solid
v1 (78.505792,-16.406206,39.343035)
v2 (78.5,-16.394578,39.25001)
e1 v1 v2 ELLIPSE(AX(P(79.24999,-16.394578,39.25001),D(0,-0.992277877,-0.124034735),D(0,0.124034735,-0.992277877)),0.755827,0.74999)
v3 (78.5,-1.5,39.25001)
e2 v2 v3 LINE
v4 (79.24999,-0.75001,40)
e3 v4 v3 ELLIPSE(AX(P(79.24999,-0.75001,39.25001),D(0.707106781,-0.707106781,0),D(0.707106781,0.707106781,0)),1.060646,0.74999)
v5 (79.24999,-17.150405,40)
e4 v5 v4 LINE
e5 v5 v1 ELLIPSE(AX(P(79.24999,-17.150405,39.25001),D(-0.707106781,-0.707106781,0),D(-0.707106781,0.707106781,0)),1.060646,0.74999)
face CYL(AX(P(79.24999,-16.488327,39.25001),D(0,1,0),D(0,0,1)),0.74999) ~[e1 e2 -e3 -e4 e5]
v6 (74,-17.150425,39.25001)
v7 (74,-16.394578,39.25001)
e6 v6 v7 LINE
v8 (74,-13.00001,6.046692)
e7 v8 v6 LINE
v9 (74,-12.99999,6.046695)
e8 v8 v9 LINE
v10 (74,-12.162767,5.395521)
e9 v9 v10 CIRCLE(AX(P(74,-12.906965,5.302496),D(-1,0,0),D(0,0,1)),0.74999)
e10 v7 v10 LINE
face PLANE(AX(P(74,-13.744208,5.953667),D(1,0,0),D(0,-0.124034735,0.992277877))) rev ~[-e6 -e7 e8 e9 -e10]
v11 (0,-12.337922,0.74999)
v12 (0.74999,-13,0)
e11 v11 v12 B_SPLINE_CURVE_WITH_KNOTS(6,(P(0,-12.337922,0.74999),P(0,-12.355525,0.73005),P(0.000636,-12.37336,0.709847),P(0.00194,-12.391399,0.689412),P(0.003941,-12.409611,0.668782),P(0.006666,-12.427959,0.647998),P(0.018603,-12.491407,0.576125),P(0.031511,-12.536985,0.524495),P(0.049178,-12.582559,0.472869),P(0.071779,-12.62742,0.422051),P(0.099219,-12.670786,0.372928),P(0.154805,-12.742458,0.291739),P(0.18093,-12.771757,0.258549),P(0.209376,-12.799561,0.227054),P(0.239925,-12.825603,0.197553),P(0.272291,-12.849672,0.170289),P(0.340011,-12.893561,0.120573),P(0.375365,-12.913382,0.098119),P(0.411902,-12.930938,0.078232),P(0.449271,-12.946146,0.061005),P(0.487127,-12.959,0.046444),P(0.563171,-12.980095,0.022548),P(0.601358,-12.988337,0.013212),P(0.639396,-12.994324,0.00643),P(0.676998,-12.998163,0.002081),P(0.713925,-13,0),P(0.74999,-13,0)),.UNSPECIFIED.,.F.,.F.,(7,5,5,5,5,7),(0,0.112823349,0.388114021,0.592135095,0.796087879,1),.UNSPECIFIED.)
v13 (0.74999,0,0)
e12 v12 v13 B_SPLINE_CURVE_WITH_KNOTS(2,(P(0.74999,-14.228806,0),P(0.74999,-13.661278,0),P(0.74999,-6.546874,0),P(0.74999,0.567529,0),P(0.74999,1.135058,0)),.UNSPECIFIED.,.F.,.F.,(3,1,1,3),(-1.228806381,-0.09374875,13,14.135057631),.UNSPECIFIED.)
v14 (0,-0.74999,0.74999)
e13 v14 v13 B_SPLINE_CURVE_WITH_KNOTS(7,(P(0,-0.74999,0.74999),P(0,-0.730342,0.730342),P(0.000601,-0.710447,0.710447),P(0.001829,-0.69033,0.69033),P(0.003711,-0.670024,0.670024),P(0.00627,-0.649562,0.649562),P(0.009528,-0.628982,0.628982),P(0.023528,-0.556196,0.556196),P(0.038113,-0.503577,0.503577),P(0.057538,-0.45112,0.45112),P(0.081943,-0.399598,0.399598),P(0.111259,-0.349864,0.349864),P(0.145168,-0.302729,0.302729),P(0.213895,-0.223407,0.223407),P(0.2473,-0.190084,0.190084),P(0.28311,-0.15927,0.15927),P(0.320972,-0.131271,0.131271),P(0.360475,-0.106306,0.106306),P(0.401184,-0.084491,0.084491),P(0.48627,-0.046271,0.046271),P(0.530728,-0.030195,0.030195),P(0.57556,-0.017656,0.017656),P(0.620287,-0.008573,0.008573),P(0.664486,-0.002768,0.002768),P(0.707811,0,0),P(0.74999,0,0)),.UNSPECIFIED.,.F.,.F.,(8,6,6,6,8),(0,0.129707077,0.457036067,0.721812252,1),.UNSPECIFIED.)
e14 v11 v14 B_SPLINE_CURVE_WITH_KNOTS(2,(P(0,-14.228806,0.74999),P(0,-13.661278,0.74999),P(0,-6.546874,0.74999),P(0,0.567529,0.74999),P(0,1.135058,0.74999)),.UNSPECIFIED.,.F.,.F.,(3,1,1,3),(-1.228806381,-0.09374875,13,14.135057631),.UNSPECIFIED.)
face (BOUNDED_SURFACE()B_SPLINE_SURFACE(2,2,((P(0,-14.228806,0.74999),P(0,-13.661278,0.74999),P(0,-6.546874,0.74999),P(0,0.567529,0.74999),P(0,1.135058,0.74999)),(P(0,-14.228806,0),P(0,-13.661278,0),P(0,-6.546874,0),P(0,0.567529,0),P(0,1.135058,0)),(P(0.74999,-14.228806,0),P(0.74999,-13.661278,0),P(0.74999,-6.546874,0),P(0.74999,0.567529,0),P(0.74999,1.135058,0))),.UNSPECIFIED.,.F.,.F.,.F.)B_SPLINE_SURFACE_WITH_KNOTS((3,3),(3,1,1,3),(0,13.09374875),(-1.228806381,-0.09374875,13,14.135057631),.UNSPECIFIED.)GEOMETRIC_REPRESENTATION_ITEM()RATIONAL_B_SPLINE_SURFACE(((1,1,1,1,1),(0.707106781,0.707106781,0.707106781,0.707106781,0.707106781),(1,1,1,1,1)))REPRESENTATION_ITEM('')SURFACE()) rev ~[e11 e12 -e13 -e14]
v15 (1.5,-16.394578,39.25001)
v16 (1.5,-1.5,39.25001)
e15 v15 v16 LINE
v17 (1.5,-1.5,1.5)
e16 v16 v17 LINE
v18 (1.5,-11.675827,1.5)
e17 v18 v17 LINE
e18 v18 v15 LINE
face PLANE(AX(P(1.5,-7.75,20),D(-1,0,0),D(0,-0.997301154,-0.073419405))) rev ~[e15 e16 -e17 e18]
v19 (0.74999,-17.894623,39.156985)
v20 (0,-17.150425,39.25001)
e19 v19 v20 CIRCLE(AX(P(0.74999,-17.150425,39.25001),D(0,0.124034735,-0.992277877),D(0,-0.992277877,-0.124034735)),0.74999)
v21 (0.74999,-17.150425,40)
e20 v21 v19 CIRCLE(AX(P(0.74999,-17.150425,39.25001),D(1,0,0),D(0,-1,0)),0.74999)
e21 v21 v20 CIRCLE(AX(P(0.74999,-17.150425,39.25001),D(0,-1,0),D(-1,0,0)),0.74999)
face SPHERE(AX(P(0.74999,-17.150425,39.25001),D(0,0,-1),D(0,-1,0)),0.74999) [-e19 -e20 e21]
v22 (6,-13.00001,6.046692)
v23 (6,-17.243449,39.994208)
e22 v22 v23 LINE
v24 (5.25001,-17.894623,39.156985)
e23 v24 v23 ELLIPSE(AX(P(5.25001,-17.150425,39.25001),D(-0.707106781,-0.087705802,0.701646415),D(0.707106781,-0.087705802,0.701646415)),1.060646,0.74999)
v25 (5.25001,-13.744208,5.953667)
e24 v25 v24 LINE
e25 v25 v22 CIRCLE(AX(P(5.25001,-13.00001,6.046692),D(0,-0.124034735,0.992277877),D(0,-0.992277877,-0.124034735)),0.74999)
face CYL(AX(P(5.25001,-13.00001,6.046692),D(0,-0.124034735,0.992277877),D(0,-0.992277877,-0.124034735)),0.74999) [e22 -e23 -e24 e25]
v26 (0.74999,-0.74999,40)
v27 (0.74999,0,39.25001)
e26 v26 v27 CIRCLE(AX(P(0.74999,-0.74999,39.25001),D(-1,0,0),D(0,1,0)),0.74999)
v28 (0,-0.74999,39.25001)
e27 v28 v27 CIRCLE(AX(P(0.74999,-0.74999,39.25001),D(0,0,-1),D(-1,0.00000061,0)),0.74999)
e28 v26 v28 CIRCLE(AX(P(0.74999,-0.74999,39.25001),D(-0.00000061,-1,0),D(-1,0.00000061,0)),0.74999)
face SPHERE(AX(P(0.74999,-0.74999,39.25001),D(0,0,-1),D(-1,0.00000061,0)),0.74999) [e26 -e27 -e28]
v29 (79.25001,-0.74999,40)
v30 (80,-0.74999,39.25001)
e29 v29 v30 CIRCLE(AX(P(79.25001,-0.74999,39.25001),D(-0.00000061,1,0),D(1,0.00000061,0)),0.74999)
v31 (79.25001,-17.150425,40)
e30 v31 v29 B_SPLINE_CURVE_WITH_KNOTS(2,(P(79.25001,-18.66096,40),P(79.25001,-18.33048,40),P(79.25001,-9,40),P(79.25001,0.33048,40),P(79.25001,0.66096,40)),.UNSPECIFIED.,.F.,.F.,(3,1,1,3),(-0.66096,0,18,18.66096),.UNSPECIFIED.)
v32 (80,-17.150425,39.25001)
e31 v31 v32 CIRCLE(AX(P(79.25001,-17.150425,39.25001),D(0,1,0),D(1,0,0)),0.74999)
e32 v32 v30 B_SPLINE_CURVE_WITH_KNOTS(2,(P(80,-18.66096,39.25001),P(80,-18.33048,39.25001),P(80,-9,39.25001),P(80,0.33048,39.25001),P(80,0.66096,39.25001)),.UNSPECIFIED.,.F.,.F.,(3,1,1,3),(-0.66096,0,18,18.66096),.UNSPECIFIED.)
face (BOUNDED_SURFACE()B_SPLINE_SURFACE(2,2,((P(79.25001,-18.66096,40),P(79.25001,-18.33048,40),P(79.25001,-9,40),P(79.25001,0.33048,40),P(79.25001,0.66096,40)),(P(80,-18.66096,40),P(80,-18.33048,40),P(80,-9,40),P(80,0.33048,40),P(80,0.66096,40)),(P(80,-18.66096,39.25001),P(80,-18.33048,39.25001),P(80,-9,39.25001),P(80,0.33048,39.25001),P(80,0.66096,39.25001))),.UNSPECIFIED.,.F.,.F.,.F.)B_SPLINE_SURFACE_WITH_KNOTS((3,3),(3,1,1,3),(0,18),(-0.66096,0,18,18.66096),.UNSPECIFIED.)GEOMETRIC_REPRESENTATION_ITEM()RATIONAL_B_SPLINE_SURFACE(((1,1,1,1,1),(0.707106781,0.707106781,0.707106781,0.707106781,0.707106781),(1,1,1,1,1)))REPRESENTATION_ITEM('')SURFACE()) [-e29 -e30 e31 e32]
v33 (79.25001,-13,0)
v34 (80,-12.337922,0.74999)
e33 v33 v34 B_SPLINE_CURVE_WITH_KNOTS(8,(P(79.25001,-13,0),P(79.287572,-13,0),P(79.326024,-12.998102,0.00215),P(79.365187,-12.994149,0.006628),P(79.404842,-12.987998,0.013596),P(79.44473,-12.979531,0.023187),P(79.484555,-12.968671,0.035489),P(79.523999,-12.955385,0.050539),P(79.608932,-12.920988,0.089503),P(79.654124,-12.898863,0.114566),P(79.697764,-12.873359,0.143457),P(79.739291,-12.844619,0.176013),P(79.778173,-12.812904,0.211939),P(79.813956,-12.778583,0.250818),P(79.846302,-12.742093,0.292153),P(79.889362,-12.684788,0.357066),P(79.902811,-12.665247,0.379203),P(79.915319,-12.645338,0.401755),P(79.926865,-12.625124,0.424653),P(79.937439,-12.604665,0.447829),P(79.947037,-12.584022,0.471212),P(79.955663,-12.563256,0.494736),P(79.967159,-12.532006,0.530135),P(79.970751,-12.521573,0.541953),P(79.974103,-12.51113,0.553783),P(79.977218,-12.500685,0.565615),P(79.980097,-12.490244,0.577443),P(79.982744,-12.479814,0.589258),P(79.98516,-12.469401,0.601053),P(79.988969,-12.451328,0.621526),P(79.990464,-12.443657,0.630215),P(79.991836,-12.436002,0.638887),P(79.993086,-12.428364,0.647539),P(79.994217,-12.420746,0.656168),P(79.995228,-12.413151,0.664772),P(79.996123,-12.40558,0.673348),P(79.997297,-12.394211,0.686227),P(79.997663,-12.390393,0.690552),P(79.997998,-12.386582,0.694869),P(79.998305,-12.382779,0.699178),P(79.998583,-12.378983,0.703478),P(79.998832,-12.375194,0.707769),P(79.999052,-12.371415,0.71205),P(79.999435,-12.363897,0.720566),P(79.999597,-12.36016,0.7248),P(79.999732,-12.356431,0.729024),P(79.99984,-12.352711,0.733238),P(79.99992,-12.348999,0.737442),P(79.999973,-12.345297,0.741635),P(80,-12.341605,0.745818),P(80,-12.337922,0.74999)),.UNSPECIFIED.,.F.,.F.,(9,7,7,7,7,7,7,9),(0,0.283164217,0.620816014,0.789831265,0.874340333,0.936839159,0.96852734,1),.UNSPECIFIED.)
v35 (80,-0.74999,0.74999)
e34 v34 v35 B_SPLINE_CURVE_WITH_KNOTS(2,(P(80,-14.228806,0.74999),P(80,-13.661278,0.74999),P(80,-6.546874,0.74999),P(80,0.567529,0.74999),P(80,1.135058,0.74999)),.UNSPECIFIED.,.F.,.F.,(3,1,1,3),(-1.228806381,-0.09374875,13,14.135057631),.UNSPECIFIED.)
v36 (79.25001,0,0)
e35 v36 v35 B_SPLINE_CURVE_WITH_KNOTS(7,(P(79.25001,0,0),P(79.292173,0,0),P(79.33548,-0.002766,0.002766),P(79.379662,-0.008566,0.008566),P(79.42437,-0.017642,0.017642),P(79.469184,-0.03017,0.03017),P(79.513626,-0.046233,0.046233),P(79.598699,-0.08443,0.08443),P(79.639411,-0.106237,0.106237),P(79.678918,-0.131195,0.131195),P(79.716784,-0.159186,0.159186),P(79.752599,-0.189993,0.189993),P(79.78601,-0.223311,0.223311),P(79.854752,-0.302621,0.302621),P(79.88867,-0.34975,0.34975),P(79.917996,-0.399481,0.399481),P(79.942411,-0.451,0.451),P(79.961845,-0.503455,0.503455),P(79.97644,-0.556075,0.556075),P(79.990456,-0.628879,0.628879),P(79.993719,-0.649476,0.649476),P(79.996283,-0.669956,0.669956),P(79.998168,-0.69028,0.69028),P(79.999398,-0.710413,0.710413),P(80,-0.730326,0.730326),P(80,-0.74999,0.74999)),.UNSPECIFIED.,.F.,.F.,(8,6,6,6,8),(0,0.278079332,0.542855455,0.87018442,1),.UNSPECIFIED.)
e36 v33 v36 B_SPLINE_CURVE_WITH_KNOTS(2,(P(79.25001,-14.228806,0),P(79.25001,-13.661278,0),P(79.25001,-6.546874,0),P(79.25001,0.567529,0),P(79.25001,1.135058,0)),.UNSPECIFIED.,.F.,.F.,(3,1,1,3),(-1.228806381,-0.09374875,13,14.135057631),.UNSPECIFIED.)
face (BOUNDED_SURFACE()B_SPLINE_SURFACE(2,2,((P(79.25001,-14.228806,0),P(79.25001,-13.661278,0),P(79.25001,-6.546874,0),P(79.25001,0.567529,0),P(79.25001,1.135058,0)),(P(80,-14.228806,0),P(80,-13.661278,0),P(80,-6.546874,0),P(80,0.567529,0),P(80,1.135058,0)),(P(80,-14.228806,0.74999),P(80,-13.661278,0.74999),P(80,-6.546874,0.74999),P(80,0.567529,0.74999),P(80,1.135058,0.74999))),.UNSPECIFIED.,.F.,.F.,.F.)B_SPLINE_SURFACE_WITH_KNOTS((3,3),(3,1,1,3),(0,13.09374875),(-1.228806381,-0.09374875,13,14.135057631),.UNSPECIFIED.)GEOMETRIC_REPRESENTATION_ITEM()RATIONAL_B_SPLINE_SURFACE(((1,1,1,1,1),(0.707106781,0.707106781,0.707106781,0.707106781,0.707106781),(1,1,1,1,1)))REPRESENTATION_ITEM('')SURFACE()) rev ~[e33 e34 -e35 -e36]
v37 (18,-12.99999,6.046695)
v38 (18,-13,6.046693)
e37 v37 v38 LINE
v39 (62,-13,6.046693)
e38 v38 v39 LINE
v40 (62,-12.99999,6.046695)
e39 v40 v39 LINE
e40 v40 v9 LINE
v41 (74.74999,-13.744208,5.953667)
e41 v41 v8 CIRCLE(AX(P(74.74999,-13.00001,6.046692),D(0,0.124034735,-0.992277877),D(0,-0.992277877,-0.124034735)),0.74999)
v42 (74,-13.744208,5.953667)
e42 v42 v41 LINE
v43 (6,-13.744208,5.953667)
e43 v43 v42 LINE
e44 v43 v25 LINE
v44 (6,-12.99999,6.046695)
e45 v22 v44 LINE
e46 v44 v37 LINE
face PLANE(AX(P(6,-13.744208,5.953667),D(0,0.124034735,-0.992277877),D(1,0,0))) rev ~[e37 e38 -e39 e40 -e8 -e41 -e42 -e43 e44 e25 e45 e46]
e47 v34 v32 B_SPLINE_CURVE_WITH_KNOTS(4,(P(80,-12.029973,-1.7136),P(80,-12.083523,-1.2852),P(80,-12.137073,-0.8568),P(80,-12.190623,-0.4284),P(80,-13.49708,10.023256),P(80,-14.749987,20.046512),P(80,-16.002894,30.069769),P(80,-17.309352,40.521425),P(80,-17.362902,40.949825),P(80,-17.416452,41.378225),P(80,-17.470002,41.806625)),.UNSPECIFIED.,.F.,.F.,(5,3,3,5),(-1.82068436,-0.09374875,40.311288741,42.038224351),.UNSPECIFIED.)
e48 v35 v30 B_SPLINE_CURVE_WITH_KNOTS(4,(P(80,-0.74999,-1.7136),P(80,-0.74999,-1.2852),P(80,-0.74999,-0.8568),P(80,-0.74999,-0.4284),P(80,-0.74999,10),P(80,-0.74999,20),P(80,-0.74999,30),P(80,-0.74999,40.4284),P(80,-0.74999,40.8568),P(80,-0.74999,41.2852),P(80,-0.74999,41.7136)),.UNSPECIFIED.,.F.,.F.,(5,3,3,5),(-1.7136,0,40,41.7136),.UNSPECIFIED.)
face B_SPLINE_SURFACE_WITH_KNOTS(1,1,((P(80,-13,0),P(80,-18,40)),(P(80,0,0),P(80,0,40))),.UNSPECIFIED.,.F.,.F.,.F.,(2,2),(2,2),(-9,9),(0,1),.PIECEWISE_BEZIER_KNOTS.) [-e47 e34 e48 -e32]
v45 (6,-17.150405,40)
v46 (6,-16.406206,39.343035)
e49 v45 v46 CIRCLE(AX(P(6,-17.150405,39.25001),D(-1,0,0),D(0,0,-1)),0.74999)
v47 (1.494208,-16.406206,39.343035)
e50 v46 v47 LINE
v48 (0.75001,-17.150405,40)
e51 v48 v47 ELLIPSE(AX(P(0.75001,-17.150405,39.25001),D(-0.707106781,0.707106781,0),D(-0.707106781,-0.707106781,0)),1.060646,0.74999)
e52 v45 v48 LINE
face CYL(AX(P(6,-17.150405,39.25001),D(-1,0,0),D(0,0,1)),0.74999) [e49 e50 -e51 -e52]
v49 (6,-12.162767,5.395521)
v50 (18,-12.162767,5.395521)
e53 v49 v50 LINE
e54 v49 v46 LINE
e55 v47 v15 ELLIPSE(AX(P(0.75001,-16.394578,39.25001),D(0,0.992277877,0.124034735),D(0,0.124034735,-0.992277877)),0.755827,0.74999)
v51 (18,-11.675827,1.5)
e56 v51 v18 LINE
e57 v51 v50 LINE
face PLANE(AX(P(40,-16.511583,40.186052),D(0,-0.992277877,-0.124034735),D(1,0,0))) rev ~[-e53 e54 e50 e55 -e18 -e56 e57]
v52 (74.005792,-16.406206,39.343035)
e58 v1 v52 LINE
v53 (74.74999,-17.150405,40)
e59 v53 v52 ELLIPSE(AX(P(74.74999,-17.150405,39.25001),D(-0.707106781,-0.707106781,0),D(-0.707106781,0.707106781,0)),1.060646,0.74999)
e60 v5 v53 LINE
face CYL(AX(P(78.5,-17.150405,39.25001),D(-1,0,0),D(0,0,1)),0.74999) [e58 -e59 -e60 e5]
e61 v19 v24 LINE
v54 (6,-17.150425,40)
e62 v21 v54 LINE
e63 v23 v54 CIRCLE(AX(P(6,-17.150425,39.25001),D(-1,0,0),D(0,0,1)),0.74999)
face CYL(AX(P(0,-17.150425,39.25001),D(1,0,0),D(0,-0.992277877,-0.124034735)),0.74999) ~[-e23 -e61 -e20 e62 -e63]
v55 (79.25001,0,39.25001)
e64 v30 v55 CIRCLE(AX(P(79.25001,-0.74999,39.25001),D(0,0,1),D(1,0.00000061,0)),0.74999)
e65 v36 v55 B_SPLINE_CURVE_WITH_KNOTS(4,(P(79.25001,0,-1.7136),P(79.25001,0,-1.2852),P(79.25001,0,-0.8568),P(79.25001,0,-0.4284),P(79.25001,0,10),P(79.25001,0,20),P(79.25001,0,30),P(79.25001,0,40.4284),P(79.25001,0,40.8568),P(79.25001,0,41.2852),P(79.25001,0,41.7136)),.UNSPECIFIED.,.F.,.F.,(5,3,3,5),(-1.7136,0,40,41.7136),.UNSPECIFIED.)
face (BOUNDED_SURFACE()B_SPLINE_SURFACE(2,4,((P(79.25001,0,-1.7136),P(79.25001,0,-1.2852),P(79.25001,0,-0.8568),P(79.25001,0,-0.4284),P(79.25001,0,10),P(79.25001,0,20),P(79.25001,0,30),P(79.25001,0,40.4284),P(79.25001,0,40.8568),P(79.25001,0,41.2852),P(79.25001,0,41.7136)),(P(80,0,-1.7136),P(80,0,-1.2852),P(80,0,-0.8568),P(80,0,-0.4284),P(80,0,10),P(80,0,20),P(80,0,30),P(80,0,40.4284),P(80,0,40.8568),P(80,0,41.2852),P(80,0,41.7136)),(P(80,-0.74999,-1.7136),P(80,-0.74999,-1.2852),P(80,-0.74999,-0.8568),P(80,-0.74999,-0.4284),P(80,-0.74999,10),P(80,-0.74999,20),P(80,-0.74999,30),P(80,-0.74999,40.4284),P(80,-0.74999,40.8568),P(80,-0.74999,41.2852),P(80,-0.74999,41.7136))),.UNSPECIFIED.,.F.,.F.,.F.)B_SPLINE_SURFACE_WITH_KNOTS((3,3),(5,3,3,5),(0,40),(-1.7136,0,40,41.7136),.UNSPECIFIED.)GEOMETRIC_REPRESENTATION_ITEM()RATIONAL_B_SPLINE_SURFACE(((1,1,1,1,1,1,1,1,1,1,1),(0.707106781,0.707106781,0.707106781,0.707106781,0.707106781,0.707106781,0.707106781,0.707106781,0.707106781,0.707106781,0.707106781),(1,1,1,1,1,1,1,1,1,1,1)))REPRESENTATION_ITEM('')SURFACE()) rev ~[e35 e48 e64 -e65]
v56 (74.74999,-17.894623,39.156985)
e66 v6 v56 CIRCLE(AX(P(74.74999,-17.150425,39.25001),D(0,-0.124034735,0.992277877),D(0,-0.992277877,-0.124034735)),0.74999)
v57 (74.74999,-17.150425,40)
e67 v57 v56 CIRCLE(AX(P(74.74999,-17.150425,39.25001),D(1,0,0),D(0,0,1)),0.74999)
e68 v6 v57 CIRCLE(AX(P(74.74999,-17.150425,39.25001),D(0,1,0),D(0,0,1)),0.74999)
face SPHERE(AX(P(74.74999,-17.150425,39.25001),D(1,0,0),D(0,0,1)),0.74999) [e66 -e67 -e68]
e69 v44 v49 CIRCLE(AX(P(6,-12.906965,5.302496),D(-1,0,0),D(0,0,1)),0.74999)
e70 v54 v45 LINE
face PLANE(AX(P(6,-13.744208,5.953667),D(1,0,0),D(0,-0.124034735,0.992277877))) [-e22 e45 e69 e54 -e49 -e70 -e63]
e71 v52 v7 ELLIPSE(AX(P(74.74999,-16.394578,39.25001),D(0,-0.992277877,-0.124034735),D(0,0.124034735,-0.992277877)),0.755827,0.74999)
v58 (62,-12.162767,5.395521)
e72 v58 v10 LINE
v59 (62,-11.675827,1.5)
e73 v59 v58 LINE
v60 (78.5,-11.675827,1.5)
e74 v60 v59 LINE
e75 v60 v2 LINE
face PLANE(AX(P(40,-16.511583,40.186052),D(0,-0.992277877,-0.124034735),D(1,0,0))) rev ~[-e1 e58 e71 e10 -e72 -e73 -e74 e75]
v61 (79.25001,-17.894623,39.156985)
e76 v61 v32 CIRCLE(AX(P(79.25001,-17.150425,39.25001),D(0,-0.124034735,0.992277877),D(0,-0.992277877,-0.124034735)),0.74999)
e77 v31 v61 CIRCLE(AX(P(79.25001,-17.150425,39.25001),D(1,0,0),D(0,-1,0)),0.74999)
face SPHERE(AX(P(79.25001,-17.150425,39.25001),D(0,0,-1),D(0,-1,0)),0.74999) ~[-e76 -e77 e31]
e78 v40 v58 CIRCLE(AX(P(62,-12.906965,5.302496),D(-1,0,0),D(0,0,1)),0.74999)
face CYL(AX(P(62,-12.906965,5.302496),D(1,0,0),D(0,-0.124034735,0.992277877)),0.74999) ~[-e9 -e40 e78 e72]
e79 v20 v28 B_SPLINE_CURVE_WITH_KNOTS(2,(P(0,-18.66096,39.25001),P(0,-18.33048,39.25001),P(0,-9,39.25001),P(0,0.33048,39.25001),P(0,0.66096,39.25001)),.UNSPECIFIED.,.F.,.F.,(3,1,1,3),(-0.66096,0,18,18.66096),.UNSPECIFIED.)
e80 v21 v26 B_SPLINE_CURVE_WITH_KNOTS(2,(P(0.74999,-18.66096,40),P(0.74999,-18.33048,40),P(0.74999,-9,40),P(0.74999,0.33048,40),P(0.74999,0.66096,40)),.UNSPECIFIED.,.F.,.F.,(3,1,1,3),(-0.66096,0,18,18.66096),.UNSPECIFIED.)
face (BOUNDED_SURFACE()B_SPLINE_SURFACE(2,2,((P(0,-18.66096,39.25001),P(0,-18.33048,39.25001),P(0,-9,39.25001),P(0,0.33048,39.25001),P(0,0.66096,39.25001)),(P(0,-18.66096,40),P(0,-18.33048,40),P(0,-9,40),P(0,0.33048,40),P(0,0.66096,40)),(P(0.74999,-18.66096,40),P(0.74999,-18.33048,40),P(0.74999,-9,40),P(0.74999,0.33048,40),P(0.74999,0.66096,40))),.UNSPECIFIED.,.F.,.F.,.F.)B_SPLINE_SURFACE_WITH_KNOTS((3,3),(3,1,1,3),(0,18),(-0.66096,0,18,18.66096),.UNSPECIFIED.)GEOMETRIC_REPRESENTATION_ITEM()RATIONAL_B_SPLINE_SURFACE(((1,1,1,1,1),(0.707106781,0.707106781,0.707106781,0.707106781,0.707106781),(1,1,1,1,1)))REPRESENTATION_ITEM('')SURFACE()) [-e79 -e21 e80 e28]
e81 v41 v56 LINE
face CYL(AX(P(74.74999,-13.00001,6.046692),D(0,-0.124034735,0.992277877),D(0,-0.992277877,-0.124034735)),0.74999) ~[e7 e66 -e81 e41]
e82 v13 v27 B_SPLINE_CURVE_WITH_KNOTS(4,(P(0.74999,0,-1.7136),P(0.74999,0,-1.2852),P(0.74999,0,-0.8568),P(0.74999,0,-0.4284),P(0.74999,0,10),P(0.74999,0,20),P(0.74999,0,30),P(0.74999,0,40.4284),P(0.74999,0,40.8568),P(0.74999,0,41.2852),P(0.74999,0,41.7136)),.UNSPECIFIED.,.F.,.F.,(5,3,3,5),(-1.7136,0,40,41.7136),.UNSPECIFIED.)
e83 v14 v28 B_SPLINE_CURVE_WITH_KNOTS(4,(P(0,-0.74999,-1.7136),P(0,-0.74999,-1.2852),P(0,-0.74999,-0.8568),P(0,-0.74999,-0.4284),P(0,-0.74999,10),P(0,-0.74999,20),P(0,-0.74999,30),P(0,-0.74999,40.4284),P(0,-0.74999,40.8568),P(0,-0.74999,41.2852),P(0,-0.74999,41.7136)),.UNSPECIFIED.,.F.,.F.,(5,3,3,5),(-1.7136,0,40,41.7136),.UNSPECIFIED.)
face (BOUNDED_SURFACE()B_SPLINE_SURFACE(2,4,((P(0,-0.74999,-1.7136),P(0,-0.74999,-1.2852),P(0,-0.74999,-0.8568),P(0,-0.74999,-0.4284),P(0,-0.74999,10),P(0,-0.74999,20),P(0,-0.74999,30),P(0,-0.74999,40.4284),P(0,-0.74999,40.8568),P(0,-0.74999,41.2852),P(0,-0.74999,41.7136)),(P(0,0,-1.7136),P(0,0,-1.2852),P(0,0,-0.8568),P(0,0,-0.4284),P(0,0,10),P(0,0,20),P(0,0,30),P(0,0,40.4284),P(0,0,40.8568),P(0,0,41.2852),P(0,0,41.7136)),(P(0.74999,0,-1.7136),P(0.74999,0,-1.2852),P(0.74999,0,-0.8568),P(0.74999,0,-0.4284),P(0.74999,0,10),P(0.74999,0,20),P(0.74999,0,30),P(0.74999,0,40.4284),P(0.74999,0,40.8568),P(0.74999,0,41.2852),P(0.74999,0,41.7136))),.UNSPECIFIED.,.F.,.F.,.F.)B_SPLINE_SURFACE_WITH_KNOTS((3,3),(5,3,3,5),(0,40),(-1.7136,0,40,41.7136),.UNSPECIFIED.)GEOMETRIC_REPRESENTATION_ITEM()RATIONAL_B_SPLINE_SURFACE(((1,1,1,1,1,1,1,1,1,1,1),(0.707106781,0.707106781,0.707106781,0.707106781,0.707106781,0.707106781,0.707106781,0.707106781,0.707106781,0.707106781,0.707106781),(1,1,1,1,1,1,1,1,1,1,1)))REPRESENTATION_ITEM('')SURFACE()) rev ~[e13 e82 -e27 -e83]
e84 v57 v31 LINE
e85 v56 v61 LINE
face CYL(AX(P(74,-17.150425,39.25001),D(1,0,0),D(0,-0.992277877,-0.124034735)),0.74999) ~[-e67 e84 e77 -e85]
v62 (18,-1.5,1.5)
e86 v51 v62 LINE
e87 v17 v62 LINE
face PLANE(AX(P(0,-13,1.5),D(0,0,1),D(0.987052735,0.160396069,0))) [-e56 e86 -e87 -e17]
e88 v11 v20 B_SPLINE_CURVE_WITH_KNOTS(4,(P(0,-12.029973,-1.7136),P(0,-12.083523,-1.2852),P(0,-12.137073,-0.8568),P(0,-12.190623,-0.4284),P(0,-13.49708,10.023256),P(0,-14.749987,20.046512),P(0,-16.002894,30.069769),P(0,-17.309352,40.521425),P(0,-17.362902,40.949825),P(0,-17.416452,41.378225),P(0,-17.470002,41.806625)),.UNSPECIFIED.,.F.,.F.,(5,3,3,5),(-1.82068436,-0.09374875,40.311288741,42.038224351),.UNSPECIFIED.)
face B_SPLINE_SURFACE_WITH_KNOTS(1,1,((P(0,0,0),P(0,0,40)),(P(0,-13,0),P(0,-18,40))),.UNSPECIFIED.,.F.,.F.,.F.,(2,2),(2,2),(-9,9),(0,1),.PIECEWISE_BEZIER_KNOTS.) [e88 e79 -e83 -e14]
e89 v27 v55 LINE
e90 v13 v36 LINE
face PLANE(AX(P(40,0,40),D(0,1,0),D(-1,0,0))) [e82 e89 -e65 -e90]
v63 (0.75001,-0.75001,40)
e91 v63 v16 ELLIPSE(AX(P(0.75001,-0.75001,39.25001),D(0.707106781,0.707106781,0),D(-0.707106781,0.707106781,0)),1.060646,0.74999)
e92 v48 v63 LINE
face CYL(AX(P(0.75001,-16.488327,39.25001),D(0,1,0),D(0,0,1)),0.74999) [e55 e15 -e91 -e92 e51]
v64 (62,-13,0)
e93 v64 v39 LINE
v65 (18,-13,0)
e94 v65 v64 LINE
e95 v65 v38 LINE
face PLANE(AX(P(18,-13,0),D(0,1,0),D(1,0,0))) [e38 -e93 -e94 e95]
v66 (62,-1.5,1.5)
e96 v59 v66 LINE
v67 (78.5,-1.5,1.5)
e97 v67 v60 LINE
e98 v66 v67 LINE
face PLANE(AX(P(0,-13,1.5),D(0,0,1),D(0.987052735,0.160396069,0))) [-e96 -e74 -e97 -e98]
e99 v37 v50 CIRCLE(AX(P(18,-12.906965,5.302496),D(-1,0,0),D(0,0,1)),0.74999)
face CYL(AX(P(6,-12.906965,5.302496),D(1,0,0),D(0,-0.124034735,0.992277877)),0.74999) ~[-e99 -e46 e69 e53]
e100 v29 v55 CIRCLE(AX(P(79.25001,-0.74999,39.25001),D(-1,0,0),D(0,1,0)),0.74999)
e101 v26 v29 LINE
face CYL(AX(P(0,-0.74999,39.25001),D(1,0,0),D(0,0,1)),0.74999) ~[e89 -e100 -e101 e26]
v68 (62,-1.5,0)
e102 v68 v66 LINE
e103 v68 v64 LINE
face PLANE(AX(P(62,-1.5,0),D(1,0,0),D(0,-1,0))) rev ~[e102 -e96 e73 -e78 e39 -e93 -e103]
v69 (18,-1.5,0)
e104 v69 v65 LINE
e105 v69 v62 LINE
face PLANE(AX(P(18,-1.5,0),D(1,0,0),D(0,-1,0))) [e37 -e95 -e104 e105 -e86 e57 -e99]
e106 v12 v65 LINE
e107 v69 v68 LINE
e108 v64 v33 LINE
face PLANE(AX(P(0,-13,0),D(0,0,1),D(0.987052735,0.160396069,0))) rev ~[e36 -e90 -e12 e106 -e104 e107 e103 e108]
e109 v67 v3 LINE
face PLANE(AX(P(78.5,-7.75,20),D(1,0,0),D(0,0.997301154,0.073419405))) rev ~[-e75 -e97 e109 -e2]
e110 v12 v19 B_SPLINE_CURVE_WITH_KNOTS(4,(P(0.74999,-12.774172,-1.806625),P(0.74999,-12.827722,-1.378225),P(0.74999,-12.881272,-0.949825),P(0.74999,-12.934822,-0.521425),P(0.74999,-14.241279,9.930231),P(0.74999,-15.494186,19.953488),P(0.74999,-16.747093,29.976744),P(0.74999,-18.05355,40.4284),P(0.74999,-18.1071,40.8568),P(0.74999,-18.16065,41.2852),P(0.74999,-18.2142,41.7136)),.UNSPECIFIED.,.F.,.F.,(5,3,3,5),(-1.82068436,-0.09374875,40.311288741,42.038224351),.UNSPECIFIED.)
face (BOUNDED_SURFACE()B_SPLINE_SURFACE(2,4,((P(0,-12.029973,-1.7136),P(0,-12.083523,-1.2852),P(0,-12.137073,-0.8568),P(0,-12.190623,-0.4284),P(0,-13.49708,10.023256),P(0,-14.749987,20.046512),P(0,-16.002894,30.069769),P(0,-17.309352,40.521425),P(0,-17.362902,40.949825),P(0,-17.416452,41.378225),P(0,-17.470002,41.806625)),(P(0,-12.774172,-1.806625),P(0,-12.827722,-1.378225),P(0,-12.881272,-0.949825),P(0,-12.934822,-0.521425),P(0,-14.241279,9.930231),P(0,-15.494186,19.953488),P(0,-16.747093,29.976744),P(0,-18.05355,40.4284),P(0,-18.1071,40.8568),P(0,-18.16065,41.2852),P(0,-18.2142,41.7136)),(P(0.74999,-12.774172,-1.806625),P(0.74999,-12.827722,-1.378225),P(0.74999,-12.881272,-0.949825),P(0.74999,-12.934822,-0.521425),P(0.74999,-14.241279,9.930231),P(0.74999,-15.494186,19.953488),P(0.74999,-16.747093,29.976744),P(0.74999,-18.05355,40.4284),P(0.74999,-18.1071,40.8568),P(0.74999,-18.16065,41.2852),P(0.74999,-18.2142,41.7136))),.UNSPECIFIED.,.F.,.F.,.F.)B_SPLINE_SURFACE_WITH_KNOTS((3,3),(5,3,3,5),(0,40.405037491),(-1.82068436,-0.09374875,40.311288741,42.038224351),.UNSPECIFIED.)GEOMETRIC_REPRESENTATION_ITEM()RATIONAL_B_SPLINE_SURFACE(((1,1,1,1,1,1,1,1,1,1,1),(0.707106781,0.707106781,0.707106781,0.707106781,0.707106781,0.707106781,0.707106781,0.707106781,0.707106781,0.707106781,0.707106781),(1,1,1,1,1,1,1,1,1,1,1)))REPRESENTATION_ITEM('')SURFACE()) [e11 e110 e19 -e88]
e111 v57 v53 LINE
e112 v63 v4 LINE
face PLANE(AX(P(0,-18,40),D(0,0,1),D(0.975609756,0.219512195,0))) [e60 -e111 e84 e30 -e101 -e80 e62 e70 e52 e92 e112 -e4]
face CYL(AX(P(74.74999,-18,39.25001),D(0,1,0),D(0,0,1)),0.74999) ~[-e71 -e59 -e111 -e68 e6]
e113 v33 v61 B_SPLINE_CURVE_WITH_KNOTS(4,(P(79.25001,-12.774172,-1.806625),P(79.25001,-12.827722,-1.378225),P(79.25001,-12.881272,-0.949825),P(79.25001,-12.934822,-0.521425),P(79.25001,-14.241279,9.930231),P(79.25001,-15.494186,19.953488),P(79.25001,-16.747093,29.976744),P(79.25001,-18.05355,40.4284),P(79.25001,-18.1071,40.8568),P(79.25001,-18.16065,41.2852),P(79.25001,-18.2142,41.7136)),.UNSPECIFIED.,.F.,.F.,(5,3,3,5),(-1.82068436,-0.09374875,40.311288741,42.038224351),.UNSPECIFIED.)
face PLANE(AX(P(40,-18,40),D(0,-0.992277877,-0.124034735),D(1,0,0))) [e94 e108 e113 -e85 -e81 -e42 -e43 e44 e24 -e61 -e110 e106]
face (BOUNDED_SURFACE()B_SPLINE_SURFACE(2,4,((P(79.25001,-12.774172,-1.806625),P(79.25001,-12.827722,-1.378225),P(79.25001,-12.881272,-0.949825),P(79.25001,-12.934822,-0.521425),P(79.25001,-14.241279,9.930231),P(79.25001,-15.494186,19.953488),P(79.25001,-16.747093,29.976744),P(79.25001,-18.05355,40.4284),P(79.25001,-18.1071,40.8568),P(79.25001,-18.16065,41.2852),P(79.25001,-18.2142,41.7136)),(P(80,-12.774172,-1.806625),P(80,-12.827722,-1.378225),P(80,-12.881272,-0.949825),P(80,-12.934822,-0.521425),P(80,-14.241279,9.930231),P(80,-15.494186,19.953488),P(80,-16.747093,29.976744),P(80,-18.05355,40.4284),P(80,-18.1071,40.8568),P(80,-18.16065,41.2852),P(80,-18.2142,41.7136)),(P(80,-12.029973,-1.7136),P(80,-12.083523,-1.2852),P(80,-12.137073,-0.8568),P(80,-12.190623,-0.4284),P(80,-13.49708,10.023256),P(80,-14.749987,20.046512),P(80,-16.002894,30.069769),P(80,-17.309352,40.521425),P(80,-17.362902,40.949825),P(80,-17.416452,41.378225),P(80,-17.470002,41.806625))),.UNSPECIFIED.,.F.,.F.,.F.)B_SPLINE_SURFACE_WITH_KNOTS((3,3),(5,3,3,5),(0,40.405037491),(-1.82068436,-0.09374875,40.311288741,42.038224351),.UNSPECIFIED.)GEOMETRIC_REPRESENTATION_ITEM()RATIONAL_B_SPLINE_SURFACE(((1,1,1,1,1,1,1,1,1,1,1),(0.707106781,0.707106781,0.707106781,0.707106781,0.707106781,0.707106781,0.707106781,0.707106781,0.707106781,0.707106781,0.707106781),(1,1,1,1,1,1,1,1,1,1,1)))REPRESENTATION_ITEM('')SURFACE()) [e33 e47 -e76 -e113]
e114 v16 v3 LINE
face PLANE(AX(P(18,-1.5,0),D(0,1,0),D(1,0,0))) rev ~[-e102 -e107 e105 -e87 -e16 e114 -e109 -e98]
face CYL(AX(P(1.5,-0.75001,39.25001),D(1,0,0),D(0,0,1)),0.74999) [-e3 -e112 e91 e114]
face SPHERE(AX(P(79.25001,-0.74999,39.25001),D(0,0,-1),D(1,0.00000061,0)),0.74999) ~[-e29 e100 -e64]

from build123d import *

# Parameters (mm, degrees)
F0_W     = 80
F0_H     = 13
F2_W     = 80
F2_H     = 18
F4_T     = -1.5
F5_W     = 68
F5_H     = 34.3112887415
F6_DEPTH = 2.7
F7_W     = 44
F7_H     = 11.5
F8_DEPTH = 25
F9_R     = 0.74999


# Not quite as in the source:
# - a fillet or chamfer is up to 0.001 mm smaller than in the source, because OpenCascade refuses the exact size


with BuildPart() as f3:
    # F0 (on Top) → F3 section 0
    with BuildSketch(Plane.XY):
        with Locations((40, -6.5)):
            Rectangle(F0_W, F0_H)
    # F2 (on offset) → F3 section 1
    with BuildSketch(Plane.XY.offset(40)):
        with Locations((40, -9)):
            Rectangle(F2_W, F2_H)
    loft()

    # F4
    f4_openings = [f3.faces().sort_by_distance(p)[0] for p in [
        (40, -9, 40),
    ]]
    offset(amount=F4_T, openings=f4_openings)

    # F5 (on face) → F6 (cut)
    with BuildSketch(Plane(origin=(0, -12.8, -1.6), x_dir=(1, 0, 0), z_dir=(0, -0.9922778767, -0.1240347346))):
        with Locations((40, 24.7680959204)):
            Rectangle(F5_W, F5_H)
    extrude(amount=-F6_DEPTH, mode=Mode.SUBTRACT)

    # F7 (on face) → F8 (cut)
    with BuildSketch(Plane(origin=(0, 0, 0), x_dir=(1, 0, 0), z_dir=(0, 0, -1))):
        with Locations((40, 7.25)):
            Rectangle(F7_W, F7_H)
    extrude(amount=-F8_DEPTH, mode=Mode.SUBTRACT)

    # F9 (radius 0.75 in the source; OpenCascade refuses exactly that, so slightly less here)
    f9_edges = [f3.edges().sort_by_distance(p)[0] for p in [
        (80, -15.5, 20),
        (80, -6.5, 0),
        (80, 0, 20),
        (0, -15.5, 20),
        (0, 0, 20),
        (0, -6.5, 0),
        (6, -15.872104, 22.976834),
        (74, -15.872104, 22.976834),
        (3, -18, 40),
        (77, -18, 40),
        (80, -9, 40),
        (74, -17.244163, 40),
        (0, -9, 40),
        (40, 0, 40),
        (3.75, -16.488327, 40),
        (1.5, -8.994163, 40),
        (40, -1.5, 40),
        (78.5, -8.994163, 40),
        (76.25, -16.488327, 40),
        (12, -12.255792, 6.139719),
        (68, -12.255792, 6.139719),
    ]]
    fillet(f9_edges, radius=F9_R)


solid = f3.part
